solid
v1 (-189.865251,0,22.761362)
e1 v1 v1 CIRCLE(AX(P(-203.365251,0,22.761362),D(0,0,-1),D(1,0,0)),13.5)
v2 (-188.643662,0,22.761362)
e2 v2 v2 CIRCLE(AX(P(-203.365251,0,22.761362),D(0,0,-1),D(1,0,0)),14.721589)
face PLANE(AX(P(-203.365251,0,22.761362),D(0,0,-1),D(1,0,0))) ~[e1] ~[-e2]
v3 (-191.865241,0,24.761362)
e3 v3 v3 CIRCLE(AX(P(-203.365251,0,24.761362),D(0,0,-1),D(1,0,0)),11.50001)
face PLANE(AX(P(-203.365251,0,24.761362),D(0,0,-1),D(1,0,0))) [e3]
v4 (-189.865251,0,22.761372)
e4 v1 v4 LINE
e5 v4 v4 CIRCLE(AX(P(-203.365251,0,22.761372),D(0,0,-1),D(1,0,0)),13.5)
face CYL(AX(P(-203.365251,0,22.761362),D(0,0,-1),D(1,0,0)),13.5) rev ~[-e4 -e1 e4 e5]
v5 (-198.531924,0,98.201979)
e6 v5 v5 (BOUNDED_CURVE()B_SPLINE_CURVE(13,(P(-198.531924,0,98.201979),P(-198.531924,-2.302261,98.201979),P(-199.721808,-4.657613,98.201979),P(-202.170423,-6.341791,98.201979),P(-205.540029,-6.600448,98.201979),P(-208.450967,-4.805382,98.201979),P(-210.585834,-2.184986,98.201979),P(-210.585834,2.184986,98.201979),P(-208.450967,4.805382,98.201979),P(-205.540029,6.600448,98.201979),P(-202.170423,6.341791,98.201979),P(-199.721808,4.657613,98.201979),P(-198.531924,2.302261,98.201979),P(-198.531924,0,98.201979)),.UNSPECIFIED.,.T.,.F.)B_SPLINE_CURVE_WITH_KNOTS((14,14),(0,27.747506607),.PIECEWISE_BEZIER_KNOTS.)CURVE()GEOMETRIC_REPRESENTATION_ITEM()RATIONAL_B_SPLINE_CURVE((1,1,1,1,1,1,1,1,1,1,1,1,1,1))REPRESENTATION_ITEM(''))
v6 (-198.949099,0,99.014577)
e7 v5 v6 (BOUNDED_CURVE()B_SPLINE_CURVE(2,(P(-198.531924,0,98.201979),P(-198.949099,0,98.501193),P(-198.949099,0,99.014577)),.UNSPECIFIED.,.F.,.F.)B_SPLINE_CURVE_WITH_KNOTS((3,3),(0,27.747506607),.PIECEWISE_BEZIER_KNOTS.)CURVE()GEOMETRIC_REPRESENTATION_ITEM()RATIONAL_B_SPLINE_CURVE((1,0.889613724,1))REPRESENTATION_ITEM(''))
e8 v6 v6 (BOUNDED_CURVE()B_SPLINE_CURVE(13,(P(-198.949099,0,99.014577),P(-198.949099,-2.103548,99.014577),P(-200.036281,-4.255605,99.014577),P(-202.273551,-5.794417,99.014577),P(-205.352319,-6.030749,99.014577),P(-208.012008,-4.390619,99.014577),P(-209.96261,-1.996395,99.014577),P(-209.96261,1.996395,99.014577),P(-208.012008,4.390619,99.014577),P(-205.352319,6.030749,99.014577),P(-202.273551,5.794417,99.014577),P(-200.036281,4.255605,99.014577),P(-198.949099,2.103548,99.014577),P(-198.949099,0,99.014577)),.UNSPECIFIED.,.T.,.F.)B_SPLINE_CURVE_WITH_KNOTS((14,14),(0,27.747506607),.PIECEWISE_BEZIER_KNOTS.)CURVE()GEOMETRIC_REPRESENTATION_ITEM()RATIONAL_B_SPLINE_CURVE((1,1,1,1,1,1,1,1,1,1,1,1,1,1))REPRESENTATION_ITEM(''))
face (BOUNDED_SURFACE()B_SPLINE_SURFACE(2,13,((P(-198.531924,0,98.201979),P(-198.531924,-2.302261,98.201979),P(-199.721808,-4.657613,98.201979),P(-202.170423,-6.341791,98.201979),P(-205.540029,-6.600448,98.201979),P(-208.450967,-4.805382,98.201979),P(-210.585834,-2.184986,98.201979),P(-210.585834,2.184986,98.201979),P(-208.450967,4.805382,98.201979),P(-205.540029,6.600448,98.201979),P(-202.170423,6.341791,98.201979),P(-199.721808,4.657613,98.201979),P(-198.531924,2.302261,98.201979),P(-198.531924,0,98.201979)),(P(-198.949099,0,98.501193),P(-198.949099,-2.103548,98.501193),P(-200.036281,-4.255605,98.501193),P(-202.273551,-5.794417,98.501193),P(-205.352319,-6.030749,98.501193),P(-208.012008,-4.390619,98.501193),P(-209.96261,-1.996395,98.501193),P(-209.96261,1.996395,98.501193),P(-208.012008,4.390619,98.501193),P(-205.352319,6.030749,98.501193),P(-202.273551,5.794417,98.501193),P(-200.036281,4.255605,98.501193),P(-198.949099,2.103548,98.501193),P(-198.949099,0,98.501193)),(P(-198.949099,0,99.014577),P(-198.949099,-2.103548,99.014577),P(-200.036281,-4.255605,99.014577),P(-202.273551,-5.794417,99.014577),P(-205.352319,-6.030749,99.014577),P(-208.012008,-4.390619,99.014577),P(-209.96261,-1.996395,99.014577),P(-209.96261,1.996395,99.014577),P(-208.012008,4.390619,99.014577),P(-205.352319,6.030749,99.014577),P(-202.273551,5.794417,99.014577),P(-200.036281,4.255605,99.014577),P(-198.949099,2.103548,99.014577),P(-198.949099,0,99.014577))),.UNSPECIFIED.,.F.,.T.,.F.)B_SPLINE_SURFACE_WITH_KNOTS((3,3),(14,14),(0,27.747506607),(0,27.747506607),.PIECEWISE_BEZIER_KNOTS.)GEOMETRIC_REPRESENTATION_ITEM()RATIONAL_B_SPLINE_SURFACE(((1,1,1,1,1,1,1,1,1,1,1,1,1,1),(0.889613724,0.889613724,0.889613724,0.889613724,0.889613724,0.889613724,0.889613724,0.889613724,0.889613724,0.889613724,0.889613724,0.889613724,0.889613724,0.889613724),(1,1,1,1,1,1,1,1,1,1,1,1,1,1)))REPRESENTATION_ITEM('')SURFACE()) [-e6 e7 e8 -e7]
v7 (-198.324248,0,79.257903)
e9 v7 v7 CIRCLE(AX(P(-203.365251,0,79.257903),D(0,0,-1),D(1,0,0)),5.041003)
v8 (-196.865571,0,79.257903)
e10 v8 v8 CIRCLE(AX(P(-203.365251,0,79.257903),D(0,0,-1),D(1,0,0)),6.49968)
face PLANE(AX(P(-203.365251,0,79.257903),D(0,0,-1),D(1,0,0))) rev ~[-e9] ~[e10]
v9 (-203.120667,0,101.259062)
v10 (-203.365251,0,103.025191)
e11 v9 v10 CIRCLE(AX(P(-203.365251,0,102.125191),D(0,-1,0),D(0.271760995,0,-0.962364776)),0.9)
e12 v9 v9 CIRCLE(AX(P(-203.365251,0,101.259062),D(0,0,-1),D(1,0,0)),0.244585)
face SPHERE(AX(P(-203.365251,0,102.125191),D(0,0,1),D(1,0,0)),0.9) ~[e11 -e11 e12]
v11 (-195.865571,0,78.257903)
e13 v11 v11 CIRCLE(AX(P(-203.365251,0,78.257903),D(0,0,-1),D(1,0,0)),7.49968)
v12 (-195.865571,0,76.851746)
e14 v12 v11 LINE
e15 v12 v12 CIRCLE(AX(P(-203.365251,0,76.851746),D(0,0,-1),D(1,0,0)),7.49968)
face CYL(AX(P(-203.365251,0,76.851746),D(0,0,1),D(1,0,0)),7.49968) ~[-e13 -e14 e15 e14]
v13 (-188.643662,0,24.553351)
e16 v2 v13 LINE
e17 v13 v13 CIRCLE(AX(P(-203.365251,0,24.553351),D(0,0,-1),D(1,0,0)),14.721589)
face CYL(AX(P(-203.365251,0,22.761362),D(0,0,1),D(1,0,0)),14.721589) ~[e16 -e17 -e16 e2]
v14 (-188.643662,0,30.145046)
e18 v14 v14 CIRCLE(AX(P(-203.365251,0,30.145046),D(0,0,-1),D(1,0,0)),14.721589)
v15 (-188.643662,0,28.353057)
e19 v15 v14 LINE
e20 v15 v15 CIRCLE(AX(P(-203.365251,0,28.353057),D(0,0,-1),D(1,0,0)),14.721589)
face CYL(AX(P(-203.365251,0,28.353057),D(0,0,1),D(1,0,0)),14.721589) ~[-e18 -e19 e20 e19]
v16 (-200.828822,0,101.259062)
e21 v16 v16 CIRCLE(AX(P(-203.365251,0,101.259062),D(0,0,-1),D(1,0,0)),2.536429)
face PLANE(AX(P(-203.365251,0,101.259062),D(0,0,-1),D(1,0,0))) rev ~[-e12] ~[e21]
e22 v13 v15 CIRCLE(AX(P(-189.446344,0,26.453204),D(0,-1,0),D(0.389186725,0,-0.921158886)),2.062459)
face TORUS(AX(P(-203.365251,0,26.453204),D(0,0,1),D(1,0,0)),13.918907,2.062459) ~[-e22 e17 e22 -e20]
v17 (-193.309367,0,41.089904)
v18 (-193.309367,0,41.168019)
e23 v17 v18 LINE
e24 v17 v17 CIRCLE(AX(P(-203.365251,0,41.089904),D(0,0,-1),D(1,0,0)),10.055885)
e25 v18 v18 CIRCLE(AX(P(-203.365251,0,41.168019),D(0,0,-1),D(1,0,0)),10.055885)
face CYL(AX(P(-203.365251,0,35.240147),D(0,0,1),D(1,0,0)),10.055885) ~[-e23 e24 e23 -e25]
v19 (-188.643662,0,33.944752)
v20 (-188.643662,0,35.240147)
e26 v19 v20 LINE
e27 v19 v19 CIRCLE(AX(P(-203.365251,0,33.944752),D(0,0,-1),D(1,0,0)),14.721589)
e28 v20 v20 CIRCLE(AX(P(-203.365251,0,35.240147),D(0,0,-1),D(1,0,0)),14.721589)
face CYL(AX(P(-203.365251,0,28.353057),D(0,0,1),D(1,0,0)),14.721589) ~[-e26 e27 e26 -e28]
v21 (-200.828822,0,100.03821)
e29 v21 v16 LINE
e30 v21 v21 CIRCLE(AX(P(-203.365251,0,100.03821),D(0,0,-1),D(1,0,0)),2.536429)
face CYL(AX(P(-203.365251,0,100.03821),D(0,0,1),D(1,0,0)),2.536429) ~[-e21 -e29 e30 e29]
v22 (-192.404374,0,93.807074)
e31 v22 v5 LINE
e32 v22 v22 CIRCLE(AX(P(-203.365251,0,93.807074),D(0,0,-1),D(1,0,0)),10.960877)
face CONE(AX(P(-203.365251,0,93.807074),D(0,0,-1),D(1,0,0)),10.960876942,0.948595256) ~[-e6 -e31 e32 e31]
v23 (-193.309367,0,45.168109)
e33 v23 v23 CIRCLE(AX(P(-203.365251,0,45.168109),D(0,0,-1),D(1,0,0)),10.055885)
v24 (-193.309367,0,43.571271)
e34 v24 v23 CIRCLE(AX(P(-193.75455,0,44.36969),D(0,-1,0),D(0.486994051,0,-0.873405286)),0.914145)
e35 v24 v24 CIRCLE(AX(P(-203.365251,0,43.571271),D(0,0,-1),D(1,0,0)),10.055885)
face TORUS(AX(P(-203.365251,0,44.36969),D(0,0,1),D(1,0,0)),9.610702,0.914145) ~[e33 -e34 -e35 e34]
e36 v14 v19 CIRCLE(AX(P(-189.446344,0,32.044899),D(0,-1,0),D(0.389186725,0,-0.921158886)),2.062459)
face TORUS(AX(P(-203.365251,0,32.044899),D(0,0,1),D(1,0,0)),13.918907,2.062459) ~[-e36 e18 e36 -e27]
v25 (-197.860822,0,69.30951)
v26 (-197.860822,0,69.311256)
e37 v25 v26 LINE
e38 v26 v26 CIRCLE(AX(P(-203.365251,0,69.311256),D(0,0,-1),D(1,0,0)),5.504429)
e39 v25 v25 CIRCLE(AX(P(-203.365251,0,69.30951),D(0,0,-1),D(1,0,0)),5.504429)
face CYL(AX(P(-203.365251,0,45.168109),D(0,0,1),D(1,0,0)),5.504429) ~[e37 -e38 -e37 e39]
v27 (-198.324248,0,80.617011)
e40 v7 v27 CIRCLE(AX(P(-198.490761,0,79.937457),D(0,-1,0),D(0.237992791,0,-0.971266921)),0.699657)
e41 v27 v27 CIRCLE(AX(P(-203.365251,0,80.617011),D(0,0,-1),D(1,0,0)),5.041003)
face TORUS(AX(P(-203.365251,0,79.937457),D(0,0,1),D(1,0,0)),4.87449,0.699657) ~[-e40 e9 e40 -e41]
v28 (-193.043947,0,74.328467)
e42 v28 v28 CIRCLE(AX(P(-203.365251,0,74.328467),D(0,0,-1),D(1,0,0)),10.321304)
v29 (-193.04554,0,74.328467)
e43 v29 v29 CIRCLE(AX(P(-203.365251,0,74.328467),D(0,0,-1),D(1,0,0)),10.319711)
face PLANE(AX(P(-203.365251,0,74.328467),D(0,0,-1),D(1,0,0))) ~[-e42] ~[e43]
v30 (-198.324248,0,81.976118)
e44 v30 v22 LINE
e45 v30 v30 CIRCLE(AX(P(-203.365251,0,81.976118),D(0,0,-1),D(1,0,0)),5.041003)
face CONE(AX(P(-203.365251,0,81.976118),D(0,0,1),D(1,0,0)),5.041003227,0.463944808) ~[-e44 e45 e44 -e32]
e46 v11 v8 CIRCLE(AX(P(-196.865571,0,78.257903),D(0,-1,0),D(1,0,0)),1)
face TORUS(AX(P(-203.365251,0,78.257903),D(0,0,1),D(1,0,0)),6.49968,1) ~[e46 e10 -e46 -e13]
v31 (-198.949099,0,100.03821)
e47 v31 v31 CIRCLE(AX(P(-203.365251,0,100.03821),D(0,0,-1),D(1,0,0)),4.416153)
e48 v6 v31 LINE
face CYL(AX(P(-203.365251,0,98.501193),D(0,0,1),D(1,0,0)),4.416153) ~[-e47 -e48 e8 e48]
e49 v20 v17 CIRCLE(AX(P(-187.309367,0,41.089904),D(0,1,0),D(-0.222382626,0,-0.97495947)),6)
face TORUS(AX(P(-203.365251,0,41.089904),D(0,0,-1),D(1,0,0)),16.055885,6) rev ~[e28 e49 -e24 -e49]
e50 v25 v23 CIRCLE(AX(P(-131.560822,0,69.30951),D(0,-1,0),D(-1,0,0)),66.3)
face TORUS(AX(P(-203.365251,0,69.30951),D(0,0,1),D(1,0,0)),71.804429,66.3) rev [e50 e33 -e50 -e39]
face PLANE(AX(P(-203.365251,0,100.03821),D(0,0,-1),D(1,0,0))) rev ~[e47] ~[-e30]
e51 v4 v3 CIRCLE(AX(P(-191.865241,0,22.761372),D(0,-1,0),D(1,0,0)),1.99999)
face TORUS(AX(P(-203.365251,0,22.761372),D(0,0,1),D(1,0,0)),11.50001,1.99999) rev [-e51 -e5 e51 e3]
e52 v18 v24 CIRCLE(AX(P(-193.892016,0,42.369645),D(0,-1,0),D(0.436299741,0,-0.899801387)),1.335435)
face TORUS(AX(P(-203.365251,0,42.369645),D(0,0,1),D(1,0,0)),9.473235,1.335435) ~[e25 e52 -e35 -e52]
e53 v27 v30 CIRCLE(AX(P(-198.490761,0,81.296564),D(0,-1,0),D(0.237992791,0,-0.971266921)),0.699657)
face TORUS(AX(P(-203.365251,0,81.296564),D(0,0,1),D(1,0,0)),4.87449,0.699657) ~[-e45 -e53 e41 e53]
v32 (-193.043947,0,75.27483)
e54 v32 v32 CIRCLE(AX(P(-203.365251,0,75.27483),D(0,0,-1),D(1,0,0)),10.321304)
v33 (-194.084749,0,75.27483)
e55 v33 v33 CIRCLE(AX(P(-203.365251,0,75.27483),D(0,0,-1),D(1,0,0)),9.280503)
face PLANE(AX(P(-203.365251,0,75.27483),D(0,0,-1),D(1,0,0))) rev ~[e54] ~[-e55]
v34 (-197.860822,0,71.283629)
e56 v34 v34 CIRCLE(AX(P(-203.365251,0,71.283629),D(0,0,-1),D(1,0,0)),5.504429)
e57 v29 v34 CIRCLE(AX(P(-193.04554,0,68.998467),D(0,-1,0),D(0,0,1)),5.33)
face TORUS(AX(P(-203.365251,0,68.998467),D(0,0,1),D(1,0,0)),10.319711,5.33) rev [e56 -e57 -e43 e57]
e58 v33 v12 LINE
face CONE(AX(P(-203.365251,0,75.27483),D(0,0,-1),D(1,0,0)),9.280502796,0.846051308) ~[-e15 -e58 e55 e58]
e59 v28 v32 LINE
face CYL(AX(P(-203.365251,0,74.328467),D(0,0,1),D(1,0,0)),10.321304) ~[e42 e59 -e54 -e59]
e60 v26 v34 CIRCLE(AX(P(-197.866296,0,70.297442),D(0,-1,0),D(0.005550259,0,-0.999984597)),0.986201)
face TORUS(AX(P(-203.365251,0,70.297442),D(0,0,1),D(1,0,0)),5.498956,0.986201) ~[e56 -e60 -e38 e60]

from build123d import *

# Parameters (mm, degrees)
F5_R     = 1
F6_R     = 1
F7_R     = 13.5
F8_DEPTH = 2
F9_R     = 1.99999


# Not quite as in the source:
# - a fillet or chamfer that OpenCascade refuses, or shapes differently, is made with other operations: its cross-section is extruded or revolved along the edge and cut away or added
# - a fillet or chamfer is up to 0.001 mm smaller than in the source, because OpenCascade refuses the exact size


with BuildPart() as f1:
    # F0 (on Front) → F1 (revolve)
    with BuildSketch(Plane.XZ):
        with BuildLine():
            Line((-203.3652514219, 101.259062287), (-203.3652514219, 22.761361911))
            Line((-203.3652514219, 22.761361911), (-188.6436624619, 22.761361911))
            Line((-188.6436624619, 22.761361911), (-188.6436624619, 24.5533513417))
            ThreePointArc((-188.6436624619, 24.5533513417), (-187.3838848671, 26.4532041654), (-188.6436624619, 28.3530569891))
            Line((-188.6436624619, 28.3530569891), (-188.6436624619, 30.1450464199))
            Line((-188.6436624619, 30.1450464199), (-188.6436624619, 33.9447520673))
            Line((-188.6436624619, 33.9447520673), (-188.6436624619, 35.2401472628))
            Line((-188.6436624619, 35.2401472628), (-193.309366703, 35.2401472628))
            Line((-193.309366703, 35.2401472628), (-193.309366703, 41.1680191755))
            ThreePointArc((-193.309366703, 41.1680191755), (-192.5565818681, 42.3696450889), (-193.309366703, 43.5712710023))
            ThreePointArc((-193.309366703, 43.5712710023), (-192.8404048548, 44.3696901202), (-193.309366703, 45.1681092381))
            Line((-193.309366703, 45.1681092381), (-197.8608220816, 45.1681092381))
            Line((-197.8608220816, 45.1681092381), (-197.8608220816, 69.3112561437))
            ThreePointArc((-197.8608220816, 69.3112561437), (-196.8800943317, 70.2974423766), (-197.8608220816, 71.2836286096))
            Line((-197.8608220816, 71.2836286096), (-197.8608220816, 74.3284672499))
            Line((-197.8608220816, 74.3284672499), (-193.0439472198, 74.3284672499))
            Line((-193.0439472198, 74.3284672499), (-193.0439472198, 75.2748303938))
            Line((-193.0439472198, 75.2748303938), (-194.0847486258, 75.2748303938))
            Line((-194.0847486258, 75.2748303938), (-195.8655714989, 76.8517457771))
            Line((-195.8655714989, 76.8517457771), (-195.8655714989, 79.2579033303))
            Line((-195.8655714989, 79.2579033303), (-198.3242481947, 79.2579033303))
            ThreePointArc((-198.3242481947, 79.2579033303), (-197.7911045704, 79.9374569619), (-198.3242481947, 80.6170105934))
            ThreePointArc((-198.3242481947, 80.6170105934), (-197.7911045704, 81.296564225), (-198.3242481947, 81.9761178565))
            Line((-198.3242481947, 81.9761178565), (-192.4043744802, 93.8070736003))
            Line((-192.4043744802, 93.8070736003), (-198.949098587, 98.5011926961))
            Line((-198.949098587, 98.5011926961), (-198.949098587, 100.0382101504))
            Line((-198.949098587, 100.0382101504), (-200.8288223515, 100.0382101504))
            Line((-200.8288223515, 100.0382101504), (-200.8288223515, 101.259062287))
            Line((-200.8288223515, 101.259062287), (-203.1206665266, 101.259062287))
            ThreePointArc((-203.1206665266, 101.259062287), (-202.4737595632, 102.2486501568), (-203.3652514219, 103.0251905853))
            Line((-203.3652514219, 103.0251905853), (-203.3652514219, 101.259062287))
        make_face()
        with BuildLine():
            Line((-188.6436624619, 33.9447520673), (-188.6436624619, 30.1450464199))
            ThreePointArc((-188.6436624619, 30.1450464199), (-187.3838848671, 32.0448992436), (-188.6436624619, 33.9447520673))
        make_face()
    revolve(axis=Axis((-203.3652514219, 0, 62.010212099), (0, 0, -1)))

    # F2: fillet of radius 6 on 1 edges, made by hand

    # F2_s1 → F2_t2 (revolve)
    with BuildSketch(Plane.XZ):
        with BuildLine():
            ThreePointArc((-188.6436624619, 35.2401472628), (-192.0000902375, 37.3486325423), (-193.309366703, 41.0899040806))
            Line((-193.309366703, 41.0899040806), (-193.429366703, 41.0899040806))
            Line((-193.429366703, 41.0899040806), (-193.429366703, 35.2401472628))
            Line((-193.429366703, 35.2401472628), (-193.309366703, 35.1201472628))
            ThreePointArc((-193.309366703, 35.1201472628), (-190.9765145825, 35.1201472628), (-188.6703483771, 35.1231521265))
            Line((-188.6703483771, 35.1231521265), (-188.6436624619, 35.2401472628))
        make_face()
    revolve(axis=Axis((-203.3652514219, 0, 35.2401472628), (0, 0, -1)))

    # F3: fillet of radius 66.3 on 1 edges, made by hand

    # F3_s1 → F3_t2 (revolve)
    with BuildSketch(Plane.XZ):
        with BuildLine():
            ThreePointArc((-197.8608220816, 69.3095101323), (-196.7130227674, 57.0261577479), (-193.309366703, 45.1681092381))
            Line((-193.309366703, 45.1681092381), (-194.5443375955, 44.6852812203))
            ThreePointArc((-194.5443375955, 44.6852812203), (-195.5850943923, 43.8421092381), (-197.8608220816, 43.8421092381))
            Line((-197.8608220816, 43.8421092381), (-199.1868220816, 45.1681092381))
            Line((-199.1868220816, 45.1681092381), (-199.1868220816, 69.3095101323))
            Line((-199.1868220816, 69.3095101323), (-197.8608220816, 69.3095101323))
        make_face()
    revolve(axis=Axis((-203.3652514219, 0, 45.1681092381), (0, 0, -1)))

    # F4: fillet of radius 5.33 on 1 edges, made by hand

    # F4_s1 → F4_t2 (revolve)
    with BuildSketch(Plane.XZ):
        with BuildLine():
            ThreePointArc((-193.0455404117, 74.3284672499), (-195.8941356754, 73.5033984395), (-197.8608220816, 71.2836286096))
            Line((-197.8608220816, 71.2836286096), (-197.957127715, 71.3293318368))
            ThreePointArc((-197.957127715, 71.3293318368), (-197.9674220816, 72.8060479297), (-197.9674220816, 74.3284672499))
            Line((-197.9674220816, 74.3284672499), (-197.8608220816, 74.4350672499))
            Line((-197.8608220816, 74.4350672499), (-193.0455404117, 74.4350672499))
            Line((-193.0455404117, 74.4350672499), (-193.0455404117, 74.3284672499))
        make_face()
    revolve(axis=Axis((-203.3652514219, 0, 74.3284672499), (0, 0, -1)))

    # F5
    f5_edges = [f1.edges().sort_by_distance(p)[0] for p in [
        (-210.864931, 0, 79.257903),
    ]]
    fillet(f5_edges, radius=F5_R)

    # F6
    f6_edges = [f1.edges().sort_by_distance(p)[0] for p in [
        (-207.781404, 0, 98.501193),
    ]]
    fillet(f6_edges, radius=F6_R)

    # F7 (on face) → F8 (cut)
    with BuildSketch(Plane(origin=(0, 0, 22.761361911), x_dir=(1, 0, 0), z_dir=(0, 0, -1))):
        with Locations((-203.3652514219, 0)):
            Circle(F7_R)
    extrude(amount=-F8_DEPTH, mode=Mode.SUBTRACT)

    # F9 (radius 2 in the source; OpenCascade refuses exactly that, so slightly less here)
    f9_edges = [f1.edges().sort_by_distance(p)[0] for p in [
        (-216.865251, 0, 24.761362),
    ]]
    fillet(f9_edges, radius=F9_R)


solid = f1.part
